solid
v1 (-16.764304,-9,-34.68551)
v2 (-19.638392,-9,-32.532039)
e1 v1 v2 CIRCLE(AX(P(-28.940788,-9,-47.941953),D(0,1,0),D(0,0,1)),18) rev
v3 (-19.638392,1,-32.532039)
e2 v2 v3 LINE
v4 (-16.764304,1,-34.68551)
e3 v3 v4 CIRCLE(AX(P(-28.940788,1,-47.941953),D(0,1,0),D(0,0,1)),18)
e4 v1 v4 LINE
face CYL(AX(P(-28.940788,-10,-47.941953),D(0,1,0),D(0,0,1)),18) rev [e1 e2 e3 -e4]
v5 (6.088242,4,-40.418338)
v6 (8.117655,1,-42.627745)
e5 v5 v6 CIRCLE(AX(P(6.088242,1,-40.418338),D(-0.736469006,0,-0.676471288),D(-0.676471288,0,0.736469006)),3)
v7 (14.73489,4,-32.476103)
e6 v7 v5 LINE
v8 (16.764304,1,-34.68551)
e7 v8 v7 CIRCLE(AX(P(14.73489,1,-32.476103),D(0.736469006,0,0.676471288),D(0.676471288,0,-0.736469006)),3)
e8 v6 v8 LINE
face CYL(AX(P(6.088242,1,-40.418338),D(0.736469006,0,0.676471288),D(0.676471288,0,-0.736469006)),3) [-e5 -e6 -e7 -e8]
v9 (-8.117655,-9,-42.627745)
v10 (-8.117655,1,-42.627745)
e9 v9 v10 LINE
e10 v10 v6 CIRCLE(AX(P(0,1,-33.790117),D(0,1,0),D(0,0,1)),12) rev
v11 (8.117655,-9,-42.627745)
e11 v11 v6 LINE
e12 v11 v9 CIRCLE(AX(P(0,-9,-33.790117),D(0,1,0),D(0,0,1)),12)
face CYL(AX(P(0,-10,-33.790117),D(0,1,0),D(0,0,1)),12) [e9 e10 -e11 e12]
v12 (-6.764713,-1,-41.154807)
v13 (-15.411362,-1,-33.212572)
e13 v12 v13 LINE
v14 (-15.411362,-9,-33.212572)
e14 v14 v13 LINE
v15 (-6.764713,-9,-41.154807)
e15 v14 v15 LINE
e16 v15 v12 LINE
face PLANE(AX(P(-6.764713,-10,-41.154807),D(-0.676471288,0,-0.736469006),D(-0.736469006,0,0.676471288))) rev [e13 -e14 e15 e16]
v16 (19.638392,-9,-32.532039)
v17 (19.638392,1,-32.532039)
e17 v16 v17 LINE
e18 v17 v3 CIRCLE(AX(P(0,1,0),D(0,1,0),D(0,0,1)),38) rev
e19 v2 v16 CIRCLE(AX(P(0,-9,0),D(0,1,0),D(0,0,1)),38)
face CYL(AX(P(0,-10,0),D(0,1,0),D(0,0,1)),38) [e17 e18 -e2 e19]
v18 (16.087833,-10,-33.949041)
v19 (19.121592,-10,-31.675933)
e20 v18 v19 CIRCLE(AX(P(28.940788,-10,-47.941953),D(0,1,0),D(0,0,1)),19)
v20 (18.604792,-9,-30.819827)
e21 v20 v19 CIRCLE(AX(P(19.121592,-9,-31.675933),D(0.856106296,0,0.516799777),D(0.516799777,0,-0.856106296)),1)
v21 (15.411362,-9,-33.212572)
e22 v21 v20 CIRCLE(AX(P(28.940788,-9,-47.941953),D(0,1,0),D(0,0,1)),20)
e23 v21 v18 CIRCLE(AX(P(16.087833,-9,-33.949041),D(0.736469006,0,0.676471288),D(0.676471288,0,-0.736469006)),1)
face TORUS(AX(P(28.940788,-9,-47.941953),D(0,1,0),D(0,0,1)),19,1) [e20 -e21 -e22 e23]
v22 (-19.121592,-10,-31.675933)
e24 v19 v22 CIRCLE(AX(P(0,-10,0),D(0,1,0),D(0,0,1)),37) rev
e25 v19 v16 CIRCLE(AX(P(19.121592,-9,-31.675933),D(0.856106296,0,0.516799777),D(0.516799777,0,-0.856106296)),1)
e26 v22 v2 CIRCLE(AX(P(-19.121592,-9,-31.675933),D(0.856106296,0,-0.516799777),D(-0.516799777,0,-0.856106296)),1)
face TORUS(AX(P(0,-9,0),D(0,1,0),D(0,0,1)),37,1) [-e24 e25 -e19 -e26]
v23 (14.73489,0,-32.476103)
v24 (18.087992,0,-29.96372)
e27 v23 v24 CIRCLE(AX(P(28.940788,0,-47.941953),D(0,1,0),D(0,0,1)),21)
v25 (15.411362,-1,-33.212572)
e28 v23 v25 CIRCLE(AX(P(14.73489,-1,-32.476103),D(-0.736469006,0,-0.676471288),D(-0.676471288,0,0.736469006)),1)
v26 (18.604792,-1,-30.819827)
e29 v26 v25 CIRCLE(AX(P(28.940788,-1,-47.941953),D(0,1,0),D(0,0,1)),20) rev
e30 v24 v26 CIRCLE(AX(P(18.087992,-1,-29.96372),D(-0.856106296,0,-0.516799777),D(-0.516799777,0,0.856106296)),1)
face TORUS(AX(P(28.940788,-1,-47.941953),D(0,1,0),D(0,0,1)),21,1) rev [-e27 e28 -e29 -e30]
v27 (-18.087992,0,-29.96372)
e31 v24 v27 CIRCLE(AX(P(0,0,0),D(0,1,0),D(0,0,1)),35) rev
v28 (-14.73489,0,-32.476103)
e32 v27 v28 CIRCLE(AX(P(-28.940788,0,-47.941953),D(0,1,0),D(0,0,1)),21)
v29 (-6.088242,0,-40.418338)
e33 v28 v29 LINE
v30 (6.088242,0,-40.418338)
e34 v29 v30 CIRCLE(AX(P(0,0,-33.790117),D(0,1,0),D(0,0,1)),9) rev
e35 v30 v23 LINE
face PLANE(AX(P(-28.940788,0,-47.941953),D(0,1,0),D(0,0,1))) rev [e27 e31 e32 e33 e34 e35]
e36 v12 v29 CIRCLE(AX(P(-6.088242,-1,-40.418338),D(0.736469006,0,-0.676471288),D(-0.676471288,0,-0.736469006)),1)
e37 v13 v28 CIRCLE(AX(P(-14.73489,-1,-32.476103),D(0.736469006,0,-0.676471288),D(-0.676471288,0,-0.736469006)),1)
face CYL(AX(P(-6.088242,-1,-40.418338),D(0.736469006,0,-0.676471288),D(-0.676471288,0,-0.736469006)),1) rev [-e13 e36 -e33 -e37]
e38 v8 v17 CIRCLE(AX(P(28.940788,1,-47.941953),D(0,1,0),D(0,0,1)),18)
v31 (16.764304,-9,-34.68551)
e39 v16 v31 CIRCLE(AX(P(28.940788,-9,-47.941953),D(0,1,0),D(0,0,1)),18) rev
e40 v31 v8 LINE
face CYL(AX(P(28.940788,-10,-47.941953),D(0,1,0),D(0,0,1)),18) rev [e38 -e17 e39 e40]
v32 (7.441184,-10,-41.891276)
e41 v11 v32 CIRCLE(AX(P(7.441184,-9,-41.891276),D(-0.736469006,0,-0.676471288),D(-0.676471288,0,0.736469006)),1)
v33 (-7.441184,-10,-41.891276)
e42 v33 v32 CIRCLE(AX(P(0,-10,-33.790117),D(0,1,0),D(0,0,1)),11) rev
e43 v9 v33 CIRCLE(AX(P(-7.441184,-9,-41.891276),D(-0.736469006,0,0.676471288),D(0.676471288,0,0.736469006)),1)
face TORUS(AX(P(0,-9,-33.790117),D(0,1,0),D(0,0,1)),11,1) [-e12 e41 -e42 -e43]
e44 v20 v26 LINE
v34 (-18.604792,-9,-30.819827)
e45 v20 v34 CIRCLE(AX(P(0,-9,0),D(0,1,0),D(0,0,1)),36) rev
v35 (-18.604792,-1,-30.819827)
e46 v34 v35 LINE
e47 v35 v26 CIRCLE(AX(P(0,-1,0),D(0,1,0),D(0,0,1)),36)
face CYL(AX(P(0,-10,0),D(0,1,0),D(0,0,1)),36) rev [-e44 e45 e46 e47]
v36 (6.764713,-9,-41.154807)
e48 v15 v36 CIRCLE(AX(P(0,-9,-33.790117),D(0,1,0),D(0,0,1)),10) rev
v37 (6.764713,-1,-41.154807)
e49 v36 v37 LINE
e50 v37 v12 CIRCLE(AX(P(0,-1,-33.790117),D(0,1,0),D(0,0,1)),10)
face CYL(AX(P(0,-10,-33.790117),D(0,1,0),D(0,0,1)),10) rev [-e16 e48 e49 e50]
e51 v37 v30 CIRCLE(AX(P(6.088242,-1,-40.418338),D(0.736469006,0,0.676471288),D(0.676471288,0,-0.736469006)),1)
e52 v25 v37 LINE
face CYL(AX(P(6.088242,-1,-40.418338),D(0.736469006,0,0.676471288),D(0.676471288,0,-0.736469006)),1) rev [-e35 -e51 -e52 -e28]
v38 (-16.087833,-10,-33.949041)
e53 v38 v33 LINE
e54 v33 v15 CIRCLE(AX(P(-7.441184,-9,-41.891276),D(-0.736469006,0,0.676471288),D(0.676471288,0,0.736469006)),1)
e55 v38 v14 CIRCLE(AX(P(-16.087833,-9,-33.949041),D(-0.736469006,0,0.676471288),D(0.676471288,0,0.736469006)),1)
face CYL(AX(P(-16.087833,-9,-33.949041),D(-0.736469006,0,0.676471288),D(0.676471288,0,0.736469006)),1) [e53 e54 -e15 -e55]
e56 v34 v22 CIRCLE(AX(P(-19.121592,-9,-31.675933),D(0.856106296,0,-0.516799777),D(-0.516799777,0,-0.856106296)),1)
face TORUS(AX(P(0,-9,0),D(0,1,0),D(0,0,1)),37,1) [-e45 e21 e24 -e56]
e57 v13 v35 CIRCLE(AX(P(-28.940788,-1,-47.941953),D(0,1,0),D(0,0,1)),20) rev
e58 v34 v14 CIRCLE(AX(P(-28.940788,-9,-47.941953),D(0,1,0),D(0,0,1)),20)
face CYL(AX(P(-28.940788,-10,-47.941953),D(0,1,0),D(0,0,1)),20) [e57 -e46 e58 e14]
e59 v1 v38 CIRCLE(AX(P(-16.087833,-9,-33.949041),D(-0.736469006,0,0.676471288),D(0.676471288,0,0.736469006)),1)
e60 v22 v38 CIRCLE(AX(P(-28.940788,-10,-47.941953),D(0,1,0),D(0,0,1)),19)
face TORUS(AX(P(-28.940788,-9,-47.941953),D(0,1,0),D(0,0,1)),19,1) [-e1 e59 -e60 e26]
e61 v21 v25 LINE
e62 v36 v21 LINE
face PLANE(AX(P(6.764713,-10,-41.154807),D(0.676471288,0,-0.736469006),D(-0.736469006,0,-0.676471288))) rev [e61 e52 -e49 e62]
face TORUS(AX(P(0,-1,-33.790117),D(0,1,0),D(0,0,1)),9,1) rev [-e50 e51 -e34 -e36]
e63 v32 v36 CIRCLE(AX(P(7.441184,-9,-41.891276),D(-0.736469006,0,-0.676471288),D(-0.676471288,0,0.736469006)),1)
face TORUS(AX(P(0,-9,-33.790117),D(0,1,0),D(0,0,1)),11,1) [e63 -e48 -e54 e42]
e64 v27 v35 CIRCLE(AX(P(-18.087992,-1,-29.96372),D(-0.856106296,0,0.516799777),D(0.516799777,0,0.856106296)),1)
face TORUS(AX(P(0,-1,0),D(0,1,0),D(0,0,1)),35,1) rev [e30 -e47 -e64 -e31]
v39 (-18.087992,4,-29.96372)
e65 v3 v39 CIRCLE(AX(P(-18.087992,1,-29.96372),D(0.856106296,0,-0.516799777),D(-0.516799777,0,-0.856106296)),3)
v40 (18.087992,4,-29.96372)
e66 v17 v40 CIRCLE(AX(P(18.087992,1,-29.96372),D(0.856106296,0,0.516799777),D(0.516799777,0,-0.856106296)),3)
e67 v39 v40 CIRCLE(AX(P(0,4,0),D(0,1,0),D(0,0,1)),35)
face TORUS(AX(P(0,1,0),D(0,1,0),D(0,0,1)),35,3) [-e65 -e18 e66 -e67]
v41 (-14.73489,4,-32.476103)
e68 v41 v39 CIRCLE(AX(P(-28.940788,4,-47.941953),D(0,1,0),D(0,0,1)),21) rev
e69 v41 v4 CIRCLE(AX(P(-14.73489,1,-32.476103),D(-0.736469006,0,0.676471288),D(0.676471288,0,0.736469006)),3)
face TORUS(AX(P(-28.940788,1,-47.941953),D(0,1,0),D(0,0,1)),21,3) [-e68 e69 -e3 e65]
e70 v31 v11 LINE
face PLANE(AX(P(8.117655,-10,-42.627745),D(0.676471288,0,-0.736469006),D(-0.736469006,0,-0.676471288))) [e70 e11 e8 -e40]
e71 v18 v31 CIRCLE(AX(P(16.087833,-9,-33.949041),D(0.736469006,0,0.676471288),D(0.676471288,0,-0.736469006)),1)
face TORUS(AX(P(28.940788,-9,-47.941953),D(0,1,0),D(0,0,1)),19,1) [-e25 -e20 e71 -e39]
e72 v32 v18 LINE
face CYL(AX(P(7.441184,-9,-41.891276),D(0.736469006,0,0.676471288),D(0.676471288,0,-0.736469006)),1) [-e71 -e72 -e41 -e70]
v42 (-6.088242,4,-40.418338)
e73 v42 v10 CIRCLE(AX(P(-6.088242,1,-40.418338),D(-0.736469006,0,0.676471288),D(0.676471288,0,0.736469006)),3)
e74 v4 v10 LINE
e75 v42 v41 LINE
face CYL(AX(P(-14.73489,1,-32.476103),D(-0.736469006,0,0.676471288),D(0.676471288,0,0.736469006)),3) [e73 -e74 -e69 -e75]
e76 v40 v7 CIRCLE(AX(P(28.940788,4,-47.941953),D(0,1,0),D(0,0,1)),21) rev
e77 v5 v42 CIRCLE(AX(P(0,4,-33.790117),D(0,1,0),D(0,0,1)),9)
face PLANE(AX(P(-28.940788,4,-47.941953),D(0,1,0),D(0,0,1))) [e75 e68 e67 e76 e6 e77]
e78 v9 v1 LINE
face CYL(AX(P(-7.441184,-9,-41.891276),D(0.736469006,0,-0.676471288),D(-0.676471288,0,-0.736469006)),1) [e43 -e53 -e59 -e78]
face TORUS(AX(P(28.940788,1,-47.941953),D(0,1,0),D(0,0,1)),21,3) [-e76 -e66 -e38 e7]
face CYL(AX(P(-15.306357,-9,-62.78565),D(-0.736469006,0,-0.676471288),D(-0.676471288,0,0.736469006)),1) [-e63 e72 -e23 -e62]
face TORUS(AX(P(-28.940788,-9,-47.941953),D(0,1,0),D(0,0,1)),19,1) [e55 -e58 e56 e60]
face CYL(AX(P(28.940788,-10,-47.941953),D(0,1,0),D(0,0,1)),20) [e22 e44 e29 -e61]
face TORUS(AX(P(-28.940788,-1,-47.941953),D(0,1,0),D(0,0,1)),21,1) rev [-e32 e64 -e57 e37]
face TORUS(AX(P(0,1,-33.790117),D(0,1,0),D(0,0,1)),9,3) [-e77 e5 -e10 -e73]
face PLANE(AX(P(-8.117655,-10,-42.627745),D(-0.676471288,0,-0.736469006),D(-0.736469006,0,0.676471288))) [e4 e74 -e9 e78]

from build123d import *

# Parameters (mm, degrees)
BOSS_EXTRUDE1_DEPTH = 10
BOSS_EXTRUDE2_START = 4
BOSS_EXTRUDE2_DEPTH = 4
FILLET1_R           = 1
FILLET2_R           = 3
FILLET3_R           = 1


with BuildPart() as part:
    # Sketch2 → Boss-Extrude1 (new body)
    with BuildSketch(Plane(origin=(0, 0, 0), x_dir=(1, 0, 0), z_dir=(0, 1, 0))):
        with BuildLine():
            Line((8.117655452, 42.627745196), (16.764304352, 34.685510469))
            ThreePointArc((16.764304352, 34.685510469), (18.147506186, 33.536916036), (19.638391538, 32.53203925))
            ThreePointArc((19.638391538, 32.53203925), (0, -38), (-19.638391538, 32.53203925))
            ThreePointArc((-19.638391538, 32.53203925), (-18.147506186, 33.536916036), (-16.764304352, 34.685510469))
            Line((-16.764304352, 34.685510469), (-8.117655452, 42.627745196))
            ThreePointArc((-8.117655452, 42.627745196), (0, 45.790117123), (8.117655452, 42.627745196))
        make_face()
        with BuildLine():
            Line((-6.764712877, 41.154807184), (-15.411361777, 33.212572457))
            ThreePointArc((-15.411361777, 33.212572457), (-16.948252704, 31.93635642), (-18.604791984, 30.819826658))
            ThreePointArc((-18.604791984, 30.819826658), (0, -36), (18.604791984, 30.819826658))
            ThreePointArc((18.604791984, 30.819826658), (16.948252704, 31.93635642), (15.411361777, 33.212572457))
            Line((15.411361777, 33.212572457), (6.764712877, 41.154807184))
            ThreePointArc((6.764712877, 41.154807184), (0, 43.790117123), (-6.764712877, 41.154807184))
        make_face(mode=Mode.SUBTRACT)
    extrude(amount=-BOSS_EXTRUDE1_DEPTH)

    # Sketch2<2> → Boss-Extrude2 (add)
    with BuildSketch(Plane(origin=(0, 0, 0), x_dir=(1, 0, 0), z_dir=(0, 1, 0)).offset(BOSS_EXTRUDE2_START)):
        with BuildLine():
            Line((8.117655452, 42.627745196), (16.764304352, 34.685510469))
            ThreePointArc((16.764304352, 34.685510469), (18.147506186, 33.536916036), (19.638391538, 32.53203925))
            ThreePointArc((19.638391538, 32.53203925), (0, -38), (-19.638391538, 32.53203925))
            ThreePointArc((-19.638391538, 32.53203925), (-18.147506186, 33.536916036), (-16.764304352, 34.685510469))
            Line((-16.764304352, 34.685510469), (-8.117655452, 42.627745196))
            ThreePointArc((-8.117655452, 42.627745196), (0, 45.790117123), (8.117655452, 42.627745196))
        make_face()
    extrude(amount=-BOSS_EXTRUDE2_DEPTH)

    # Fillet1
    fillet1_edges = [part.edges().sort_by_distance(p)[0] for p in [
        (16.948252704, 0, -31.93635642),
        (11.088037327, 0, -37.183689821),
        (0, 0, -43.790117123),
        (-11.088037327, 0, -37.183689821),
        (-16.948252704, 0, -31.93635642),
        (0, 0, 36),
    ]]
    fillet(fillet1_edges, radius=FILLET1_R)

    # Fillet2
    fillet2_edges = [part.edges().sort_by_distance(p)[0] for p in [
        (-18.147506186, 4, -33.536916036),
        (12.440979902, 4, -38.656627833),
        (0, 4, -45.790117123),
        (0, 4, 38),
        (18.147506186, 4, -33.536916036),
        (-12.440979902, 4, -38.656627833),
    ]]
    fillet(fillet2_edges, radius=FILLET2_R)

    # Fillet3
    fillet3_edges = [part.edges().sort_by_distance(p)[0] for p in [
        (18.147506186, -10, -33.536916036),
        (12.440979902, -10, -38.656627833),
        (0, -10, -45.790117123),
        (16.948252704, -10, -31.93635642),
        (0, -10, 36),
        (-16.948252704, -10, -31.93635642),
        (-11.088037327, -10, -37.183689821),
        (0, -10, -43.790117123),
        (11.088037327, -10, -37.183689821),
        (-12.440979902, -10, -38.656627833),
        (-18.147506186, -10, -33.536916036),
        (0, -10, 38),
    ]]
    fillet(fillet3_edges, radius=FILLET3_R - 0.0001)  # a hair under: the kernel refuses the full size


solid = part.part
